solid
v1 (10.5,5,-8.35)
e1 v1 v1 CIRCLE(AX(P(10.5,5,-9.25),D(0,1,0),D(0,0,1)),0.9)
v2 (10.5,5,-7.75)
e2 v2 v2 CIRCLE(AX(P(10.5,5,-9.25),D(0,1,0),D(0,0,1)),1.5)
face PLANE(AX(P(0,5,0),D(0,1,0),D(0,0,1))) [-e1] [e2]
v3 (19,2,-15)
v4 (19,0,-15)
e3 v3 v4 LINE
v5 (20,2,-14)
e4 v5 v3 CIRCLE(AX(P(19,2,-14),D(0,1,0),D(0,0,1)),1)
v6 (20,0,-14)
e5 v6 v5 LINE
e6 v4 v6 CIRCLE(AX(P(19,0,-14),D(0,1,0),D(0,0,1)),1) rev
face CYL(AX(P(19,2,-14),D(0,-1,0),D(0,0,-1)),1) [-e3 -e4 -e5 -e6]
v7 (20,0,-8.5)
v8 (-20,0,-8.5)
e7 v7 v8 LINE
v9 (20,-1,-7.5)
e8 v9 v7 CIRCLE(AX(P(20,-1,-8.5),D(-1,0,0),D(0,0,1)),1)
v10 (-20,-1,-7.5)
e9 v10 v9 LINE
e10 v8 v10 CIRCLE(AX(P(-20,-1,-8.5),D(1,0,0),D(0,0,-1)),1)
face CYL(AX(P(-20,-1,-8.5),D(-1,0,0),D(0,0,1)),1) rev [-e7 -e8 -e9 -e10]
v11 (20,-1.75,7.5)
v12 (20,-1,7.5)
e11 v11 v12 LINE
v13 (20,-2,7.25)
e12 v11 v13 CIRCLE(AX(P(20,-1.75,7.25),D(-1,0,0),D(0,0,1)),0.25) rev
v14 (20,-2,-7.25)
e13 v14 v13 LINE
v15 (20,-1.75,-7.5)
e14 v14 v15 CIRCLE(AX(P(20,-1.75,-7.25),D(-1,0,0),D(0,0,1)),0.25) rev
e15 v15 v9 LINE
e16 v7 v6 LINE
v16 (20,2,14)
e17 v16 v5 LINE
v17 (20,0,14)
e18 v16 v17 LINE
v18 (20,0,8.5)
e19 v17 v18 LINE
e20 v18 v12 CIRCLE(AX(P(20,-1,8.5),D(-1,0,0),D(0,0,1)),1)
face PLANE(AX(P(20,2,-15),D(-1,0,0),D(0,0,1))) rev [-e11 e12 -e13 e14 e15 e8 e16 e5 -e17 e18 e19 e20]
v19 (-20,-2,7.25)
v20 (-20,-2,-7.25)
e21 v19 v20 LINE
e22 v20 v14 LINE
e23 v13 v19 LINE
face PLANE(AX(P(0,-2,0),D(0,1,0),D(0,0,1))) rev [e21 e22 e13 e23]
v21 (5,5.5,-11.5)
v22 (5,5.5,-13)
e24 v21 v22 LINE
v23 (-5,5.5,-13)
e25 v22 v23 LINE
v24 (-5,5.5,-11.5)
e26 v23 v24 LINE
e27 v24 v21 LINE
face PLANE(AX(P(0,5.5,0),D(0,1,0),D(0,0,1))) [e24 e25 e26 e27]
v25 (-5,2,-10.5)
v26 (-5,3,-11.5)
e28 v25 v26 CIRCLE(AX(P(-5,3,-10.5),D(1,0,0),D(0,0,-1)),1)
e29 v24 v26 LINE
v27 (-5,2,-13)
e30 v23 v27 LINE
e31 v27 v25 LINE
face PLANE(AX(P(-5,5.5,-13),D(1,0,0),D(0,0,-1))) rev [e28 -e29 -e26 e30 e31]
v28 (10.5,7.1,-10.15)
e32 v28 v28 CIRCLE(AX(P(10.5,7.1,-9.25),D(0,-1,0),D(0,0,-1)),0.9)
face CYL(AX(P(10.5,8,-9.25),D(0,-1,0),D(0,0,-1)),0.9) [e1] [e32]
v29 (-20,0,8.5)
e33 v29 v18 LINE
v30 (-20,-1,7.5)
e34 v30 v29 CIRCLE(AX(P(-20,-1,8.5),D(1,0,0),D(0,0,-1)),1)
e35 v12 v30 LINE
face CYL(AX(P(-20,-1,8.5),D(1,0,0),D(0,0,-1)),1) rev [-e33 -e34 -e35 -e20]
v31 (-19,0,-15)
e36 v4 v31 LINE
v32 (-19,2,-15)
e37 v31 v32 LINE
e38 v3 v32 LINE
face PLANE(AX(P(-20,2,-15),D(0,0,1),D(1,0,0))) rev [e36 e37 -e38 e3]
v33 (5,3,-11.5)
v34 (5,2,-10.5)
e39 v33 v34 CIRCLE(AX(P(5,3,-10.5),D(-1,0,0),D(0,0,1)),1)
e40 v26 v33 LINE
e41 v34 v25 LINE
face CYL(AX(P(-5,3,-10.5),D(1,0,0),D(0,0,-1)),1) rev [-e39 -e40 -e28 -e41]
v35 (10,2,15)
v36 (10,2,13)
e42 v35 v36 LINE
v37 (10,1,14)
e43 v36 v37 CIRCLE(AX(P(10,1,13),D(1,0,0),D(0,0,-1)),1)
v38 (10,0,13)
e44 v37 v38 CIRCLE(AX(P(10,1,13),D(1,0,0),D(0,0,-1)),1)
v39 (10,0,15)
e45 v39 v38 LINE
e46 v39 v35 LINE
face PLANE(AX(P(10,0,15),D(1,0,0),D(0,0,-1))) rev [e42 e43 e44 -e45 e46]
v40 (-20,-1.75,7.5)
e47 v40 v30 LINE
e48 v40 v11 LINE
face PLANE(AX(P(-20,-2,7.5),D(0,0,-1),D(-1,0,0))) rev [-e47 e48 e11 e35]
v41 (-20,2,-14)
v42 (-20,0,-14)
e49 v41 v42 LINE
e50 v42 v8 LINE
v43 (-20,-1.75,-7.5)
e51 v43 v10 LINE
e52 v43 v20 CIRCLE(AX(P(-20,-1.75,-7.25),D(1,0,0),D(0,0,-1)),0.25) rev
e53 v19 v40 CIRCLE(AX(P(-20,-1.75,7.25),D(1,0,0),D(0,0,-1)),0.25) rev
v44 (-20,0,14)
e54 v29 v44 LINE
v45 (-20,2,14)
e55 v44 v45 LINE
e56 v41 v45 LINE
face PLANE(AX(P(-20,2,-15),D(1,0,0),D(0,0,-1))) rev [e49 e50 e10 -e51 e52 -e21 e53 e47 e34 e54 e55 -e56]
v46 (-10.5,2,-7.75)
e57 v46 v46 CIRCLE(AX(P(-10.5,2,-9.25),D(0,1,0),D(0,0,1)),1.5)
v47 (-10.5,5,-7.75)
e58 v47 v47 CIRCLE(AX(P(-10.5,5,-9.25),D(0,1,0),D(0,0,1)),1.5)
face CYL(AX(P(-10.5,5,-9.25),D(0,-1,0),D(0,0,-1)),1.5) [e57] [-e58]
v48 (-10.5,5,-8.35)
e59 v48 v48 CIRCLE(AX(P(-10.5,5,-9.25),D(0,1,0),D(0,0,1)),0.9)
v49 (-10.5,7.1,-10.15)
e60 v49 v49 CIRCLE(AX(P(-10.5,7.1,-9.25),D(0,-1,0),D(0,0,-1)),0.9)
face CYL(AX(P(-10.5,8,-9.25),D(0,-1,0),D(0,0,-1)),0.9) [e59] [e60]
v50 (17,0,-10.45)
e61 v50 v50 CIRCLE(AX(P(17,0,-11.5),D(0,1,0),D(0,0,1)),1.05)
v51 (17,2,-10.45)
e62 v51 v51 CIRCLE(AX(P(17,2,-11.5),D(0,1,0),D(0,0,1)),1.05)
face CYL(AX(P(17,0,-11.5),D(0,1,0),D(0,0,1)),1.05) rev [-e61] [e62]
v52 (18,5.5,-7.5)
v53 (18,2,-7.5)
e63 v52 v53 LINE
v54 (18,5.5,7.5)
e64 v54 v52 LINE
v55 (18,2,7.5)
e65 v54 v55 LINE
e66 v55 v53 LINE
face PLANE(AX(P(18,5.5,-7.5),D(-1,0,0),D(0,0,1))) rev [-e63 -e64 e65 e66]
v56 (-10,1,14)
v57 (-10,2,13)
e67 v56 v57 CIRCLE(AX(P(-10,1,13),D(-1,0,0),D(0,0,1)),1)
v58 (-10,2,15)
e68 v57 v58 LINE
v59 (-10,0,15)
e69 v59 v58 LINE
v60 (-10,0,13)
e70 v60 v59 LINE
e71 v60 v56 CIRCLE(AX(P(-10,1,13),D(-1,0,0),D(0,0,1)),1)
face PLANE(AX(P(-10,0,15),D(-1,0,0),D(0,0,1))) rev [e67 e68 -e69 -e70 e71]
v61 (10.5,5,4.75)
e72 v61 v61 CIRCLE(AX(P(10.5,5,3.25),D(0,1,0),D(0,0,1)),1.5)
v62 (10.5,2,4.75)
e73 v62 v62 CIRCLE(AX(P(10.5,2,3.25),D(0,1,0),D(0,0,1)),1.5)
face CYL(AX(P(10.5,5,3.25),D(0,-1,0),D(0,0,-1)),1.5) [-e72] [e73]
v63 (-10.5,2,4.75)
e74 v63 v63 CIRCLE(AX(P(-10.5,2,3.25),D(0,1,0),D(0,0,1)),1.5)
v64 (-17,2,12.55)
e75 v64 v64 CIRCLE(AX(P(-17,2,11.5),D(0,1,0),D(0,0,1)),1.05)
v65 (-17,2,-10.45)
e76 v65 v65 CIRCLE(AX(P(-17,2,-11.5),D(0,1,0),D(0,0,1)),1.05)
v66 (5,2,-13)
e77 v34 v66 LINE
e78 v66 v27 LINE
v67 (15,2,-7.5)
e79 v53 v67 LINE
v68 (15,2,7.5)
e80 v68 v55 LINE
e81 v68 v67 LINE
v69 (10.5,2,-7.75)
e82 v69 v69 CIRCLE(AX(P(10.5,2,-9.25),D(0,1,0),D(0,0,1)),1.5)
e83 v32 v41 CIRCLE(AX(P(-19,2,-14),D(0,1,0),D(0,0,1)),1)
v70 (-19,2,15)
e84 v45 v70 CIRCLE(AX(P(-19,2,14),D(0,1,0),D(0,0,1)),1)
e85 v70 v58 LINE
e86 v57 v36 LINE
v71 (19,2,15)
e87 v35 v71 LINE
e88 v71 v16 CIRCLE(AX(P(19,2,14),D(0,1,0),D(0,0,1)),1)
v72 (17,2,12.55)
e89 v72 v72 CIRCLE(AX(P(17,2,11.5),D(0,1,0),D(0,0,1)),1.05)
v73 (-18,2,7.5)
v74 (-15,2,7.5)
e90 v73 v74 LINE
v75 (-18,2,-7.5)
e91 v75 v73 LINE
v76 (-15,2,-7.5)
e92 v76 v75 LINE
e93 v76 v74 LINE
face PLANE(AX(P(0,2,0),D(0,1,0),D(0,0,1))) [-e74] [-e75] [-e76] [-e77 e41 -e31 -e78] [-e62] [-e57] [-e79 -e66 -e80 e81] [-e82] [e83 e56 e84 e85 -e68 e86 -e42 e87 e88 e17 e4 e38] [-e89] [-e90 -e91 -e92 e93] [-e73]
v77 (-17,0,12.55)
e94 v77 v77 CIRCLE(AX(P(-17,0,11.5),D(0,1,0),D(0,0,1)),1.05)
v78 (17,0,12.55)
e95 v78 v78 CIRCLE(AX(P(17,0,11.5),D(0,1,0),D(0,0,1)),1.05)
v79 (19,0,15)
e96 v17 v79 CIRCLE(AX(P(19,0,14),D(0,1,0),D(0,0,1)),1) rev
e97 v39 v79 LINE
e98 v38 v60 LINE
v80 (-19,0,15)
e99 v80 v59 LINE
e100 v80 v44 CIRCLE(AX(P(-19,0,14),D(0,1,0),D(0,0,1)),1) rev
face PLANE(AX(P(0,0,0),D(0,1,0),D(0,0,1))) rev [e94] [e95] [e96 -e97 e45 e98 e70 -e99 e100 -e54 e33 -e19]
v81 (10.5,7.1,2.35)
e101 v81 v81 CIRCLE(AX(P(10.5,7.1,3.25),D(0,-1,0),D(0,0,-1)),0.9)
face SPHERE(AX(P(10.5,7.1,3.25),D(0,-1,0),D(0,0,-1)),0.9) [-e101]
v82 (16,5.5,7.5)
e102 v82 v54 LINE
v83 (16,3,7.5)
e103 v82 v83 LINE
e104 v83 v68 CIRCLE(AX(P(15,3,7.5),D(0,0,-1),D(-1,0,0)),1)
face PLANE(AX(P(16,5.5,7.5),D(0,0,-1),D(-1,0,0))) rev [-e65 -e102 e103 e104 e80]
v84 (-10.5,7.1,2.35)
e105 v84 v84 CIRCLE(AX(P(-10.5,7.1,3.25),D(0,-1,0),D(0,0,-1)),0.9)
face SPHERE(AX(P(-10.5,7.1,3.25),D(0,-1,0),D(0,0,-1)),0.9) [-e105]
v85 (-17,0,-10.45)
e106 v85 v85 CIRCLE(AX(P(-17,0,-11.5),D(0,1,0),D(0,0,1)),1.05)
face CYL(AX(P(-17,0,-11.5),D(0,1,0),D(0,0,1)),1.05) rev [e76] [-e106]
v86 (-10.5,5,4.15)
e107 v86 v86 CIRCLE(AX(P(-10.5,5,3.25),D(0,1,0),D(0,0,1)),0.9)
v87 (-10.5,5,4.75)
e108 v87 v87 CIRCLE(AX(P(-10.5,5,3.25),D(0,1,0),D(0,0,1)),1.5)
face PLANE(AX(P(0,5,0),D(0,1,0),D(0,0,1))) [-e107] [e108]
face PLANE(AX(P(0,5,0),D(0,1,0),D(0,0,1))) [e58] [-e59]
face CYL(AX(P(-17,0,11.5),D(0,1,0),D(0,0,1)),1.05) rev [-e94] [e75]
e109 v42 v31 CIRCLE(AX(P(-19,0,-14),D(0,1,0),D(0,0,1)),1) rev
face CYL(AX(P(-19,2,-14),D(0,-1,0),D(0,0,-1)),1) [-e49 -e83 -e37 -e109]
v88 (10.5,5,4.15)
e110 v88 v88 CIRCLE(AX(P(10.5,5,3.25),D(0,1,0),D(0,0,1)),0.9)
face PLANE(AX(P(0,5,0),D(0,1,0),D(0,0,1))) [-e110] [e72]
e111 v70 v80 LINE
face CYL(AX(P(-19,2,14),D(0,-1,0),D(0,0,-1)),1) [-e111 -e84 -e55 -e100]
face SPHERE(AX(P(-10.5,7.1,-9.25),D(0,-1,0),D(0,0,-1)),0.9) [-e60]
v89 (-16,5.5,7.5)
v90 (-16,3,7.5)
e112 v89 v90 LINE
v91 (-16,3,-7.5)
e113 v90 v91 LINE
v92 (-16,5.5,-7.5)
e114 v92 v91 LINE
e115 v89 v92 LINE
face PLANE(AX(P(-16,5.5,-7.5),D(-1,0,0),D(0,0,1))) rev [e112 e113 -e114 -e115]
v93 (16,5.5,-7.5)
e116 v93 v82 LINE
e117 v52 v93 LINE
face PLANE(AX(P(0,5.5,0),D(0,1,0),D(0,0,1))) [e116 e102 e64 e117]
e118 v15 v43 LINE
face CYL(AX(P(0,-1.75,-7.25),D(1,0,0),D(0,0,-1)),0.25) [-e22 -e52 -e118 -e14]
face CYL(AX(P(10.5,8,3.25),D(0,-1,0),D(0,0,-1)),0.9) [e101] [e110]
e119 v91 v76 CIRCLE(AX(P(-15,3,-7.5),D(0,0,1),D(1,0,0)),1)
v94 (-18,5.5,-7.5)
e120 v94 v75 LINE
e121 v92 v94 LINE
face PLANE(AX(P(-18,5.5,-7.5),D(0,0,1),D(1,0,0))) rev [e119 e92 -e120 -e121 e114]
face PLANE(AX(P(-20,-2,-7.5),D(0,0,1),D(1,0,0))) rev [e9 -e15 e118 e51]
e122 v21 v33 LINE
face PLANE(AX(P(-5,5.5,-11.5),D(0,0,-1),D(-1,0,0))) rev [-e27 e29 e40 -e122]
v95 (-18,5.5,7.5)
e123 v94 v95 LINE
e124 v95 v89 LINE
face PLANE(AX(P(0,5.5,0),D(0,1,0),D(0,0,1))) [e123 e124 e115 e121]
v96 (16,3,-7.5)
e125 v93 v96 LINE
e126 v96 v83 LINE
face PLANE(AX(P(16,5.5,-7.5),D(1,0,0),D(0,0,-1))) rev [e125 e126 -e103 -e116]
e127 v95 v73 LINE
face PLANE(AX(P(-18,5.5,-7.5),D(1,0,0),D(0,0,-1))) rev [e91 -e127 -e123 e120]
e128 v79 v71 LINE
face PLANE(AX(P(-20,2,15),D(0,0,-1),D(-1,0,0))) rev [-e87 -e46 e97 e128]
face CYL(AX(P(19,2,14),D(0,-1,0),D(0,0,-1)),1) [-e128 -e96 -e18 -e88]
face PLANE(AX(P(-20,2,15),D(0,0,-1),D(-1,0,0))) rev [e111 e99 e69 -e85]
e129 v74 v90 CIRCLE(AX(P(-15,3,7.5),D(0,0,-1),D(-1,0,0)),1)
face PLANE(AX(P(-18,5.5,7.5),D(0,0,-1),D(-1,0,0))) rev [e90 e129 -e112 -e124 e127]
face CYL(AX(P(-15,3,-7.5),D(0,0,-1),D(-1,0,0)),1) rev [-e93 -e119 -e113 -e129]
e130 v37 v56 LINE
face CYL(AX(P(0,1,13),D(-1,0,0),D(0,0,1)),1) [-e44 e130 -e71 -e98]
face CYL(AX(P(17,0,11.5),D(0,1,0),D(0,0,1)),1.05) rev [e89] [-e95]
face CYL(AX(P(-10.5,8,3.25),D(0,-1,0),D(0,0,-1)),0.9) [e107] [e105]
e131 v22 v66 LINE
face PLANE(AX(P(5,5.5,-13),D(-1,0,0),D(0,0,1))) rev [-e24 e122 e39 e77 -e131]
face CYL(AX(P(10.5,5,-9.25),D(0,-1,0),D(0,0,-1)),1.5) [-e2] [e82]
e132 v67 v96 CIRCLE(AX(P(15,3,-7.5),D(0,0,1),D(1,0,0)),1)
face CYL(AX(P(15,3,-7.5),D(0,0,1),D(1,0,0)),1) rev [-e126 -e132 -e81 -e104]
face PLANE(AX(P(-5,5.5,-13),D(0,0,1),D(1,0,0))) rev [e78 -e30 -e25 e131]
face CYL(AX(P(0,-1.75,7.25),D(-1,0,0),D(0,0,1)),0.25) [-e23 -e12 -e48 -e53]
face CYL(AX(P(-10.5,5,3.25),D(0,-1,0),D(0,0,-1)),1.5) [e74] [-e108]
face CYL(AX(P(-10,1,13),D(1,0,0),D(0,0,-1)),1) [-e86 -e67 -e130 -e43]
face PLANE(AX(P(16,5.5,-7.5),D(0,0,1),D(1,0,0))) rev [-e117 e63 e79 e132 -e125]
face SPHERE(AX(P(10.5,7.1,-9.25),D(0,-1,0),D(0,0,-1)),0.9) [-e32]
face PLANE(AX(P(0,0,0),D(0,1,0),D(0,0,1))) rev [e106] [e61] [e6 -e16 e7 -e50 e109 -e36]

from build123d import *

# Parameters (mm, degrees)
SKETCH3_W               = 40
SKETCH3_H               = 30
BOSS_EXTRUDE1_DEPTH     = 2
SKETCH4_R               = 1.5
BOSS_EXTRUDE2_DEPTH     = 3
FILLET1_R               = 1
SKETCH8_W               = 20
SKETCH8_H               = 1
CUT_EXTRUDE2_DEPTH      = 2
FILLET3_R               = 1
SKETCH9_R               = 0.9
BOSS_EXTRUDE5_DEPTH     = 3
LPATTERN3_COUNT         = 2
LPATTERN3_PITCH         = 21
LPATTERN3_COUNT_DIR2    = 2
LPATTERN3_PITCH_DIR2    = 12.5
FILLET4_R               = 0.9
FILLET5_R               = 1
SKETCH11_R              = 1.05
CUT_EXTRUDE3_DEPTH      = 26.709920264
LPATTERN4_COUNT         = 2
LPATTERN4_PITCH         = 23
LPATTERN4_COUNT_DIR2    = 2
LPATTERN4_PITCH_DIR2    = 34
SKETCH12_W              = 40
SKETCH12_H              = 2.5
BOSS_EXTRUDE7_DEPTH     = 10
SKETCH13_R              = 2
CUT_EXTRUDE4_DEPTH      = 10
SKETCH14_W              = 2
SKETCH14_H              = 15
SKETCH14_W_2            = 10
SKETCH14_H_2            = 1.5
BOSS_EXTRUDE8_DEPTH     = 3.5
FILLET6_R               = 1
CUT_EXTRUDE5_DEPTH      = 44.874821937
CUT_EXTRUDE5_DEPTH_BACK = 44.874821937
SKETCH15_W              = 33.433671885
SKETCH15_H              = 17.879130682
SKETCH16_W              = 40
SKETCH16_H              = 15
BOSS_EXTRUDE9_DEPTH     = 2
FILLET8_R               = 1
FILLET9_R               = 1
FILLET10_R              = 0.25


with BuildPart() as part:
    # Sketch3 → Boss-Extrude1 (new body)
    with BuildSketch(Plane(origin=(0, 0, 0), x_dir=(1, 0, 0), z_dir=(0, 1, 0))):
        Rectangle(SKETCH3_W, SKETCH3_H)
    extrude(amount=BOSS_EXTRUDE1_DEPTH)

    # Sketch4 → Boss-Extrude2 (add)
    with BuildSketch(Plane(origin=(0, 2, 0), x_dir=(1, 0, 0), z_dir=(0, 1, 0))):
        with Locations(Location((-10.5, 9.25, 0), (0, 0, 270))):
            Circle(SKETCH4_R)
        with Locations(Location((10.5, 9.25, 0), (0, 0, 270))):
            Circle(SKETCH4_R)
        with Locations(Location((10.5, -3.25, 0), (0, 0, 270))):
            Circle(SKETCH4_R)
        with Locations(Location((-10.5, -3.25, 0), (0, 0, 270))):
            Circle(SKETCH4_R)
    extrude(amount=BOSS_EXTRUDE2_DEPTH)

    # Fillet1
    fillet1_edges = [part.edges().sort_by_distance(p)[0] for p in [
        (-20, 1, -15),
        (20, 1, -15),
    ]]
    fillet(fillet1_edges, radius=FILLET1_R)

    # Sketch8 → Cut-Extrude2 (cut)
    with BuildSketch(Plane(origin=(0, 2, 0), x_dir=(1, 0, 0), z_dir=(0, 1, 0))):
        with Locations((0, -14.5)):
            Rectangle(SKETCH8_W, SKETCH8_H)
    extrude(amount=-CUT_EXTRUDE2_DEPTH, mode=Mode.SUBTRACT)

    # Fillet3
    fillet3_edges = [part.edges().sort_by_distance(p)[0] for p in [
        (0, 0, 14),
        (0, 2, 14),
    ]]
    fillet(fillet3_edges, radius=FILLET3_R - 0.0001)  # a hair under: the kernel refuses the full size

    # Sketch9 → Boss-Extrude5 (add)
    with BuildSketch(Plane(origin=(0, 5, 0), x_dir=(1, 0, 0), z_dir=(0, 1, 0))):
        with Locations(Location((-10.5, 9.25, 0), (0, 0, 270))):
            Circle(SKETCH9_R)
    boss_extrude5 = extrude(amount=BOSS_EXTRUDE5_DEPTH)

    # LPattern3: Boss-Extrude5 2 × 2
    with Locations(*[(i * LPATTERN3_PITCH, 0, j * LPATTERN3_PITCH_DIR2) for i in range(LPATTERN3_COUNT) for j in range(LPATTERN3_COUNT_DIR2) if (i, j) != (0, 0)]):
        add(boss_extrude5)

    # Fillet4
    fillet4_edges = [part.edges().sort_by_distance(p)[0] for p in [
        (-10.5, 8, -10.15),
        (-10.5, 8, 2.35),
        (10.5, 8, -10.15),
        (10.5, 8, 2.35),
    ]]
    fillet(fillet4_edges, radius=FILLET4_R)

    # Fillet5
    fillet5_edges = [part.edges().sort_by_distance(p)[0] for p in [
        (20, 1, 15),
        (-20, 1, 15),
    ]]
    fillet(fillet5_edges, radius=FILLET5_R)

    # Sketch11 → Cut-Extrude3 (cut, through all)
    with BuildSketch(Plane(origin=(0, 2, 0), x_dir=(1, 0, 0), z_dir=(0, 1, 0))):
        with Locations(Location((-17, -11.5, 0), (0, 0, 270))):
            Circle(SKETCH11_R)
    cut_extrude3 = extrude(amount=-CUT_EXTRUDE3_DEPTH, mode=Mode.SUBTRACT)

    # LPattern4: Cut-Extrude3 2 × 2
    with Locations(*[(j * LPATTERN4_PITCH_DIR2, 0, -i * LPATTERN4_PITCH) for i in range(LPATTERN4_COUNT) for j in range(LPATTERN4_COUNT_DIR2) if (i, j) != (0, 0)]):
        add(cut_extrude3, mode=Mode.SUBTRACT)

    # Sketch12 → Boss-Extrude7 (add)
    with BuildSketch(Plane(origin=(0, 0, 0), x_dir=(-1, 0, 0), z_dir=(0, -1, 0))):
        with Locations((0, 2.25)):
            Rectangle(SKETCH12_W, SKETCH12_H)
    extrude(amount=BOSS_EXTRUDE7_DEPTH)

    # Sketch13 → Cut-Extrude4 (cut)
    with BuildSketch(Plane(origin=(0, 0, -3.5), x_dir=(-1, 0, 0), z_dir=(0, 0, -1))):
        with Locations((12, -5)):
            Circle(SKETCH13_R)
        with Locations((0, -5)):
            Circle(SKETCH13_R)
    extrude(amount=-CUT_EXTRUDE4_DEPTH, mode=Mode.SUBTRACT)

    # Sketch14 → Boss-Extrude8 (add)
    with BuildSketch(Plane(origin=(0, 2, 0), x_dir=(1, 0, 0), z_dir=(0, 1, 0))):
        with Locations((-17, 0)):
            Rectangle(SKETCH14_W, SKETCH14_H)
        with Locations((17, 0)):
            Rectangle(SKETCH14_W, SKETCH14_H)
        with Locations((0, 12.25)):
            Rectangle(SKETCH14_W_2, SKETCH14_H_2)
    extrude(amount=BOSS_EXTRUDE8_DEPTH)

    # Fillet6
    fillet6_edges = [part.edges().sort_by_distance(p)[0] for p in [
        (-16, 2, 0),
        (16, 2, 0),
        (0, 2, -11.5),
    ]]
    fillet(fillet6_edges, radius=FILLET6_R)

    # Sketch15 → Cut-Extrude5 (cut, two sides: drawn at the far end of the back side and taken through both)
    with BuildSketch(Plane.ZY.offset(20).offset(-CUT_EXTRUDE5_DEPTH_BACK)):
        with Locations((1.181680204, -8.939565341)):
            Rectangle(SKETCH15_W, SKETCH15_H)
    extrude(amount=CUT_EXTRUDE5_DEPTH + CUT_EXTRUDE5_DEPTH_BACK, mode=Mode.SUBTRACT)

    # Sketch16 → Boss-Extrude9 (add)
    with BuildSketch(Plane.XZ):
        Rectangle(SKETCH16_W, SKETCH16_H)
    extrude(amount=BOSS_EXTRUDE9_DEPTH)

    # Fillet8
    fillet8_edges = [part.edges().sort_by_distance(p)[0] for p in [
        (0, 0, -7.5),
    ]]
    fillet(fillet8_edges, radius=FILLET8_R)

    # Fillet9
    fillet9_edges = [part.edges().sort_by_distance(p)[0] for p in [
        (0, 0, 7.5),
    ]]
    fillet(fillet9_edges, radius=FILLET9_R)

    # Fillet10
    fillet10_edges = [part.edges().sort_by_distance(p)[0] for p in [
        (0, -2, 7.5),
        (0, -2, -7.5),
    ]]
    fillet(fillet10_edges, radius=FILLET10_R)


solid = part.part
